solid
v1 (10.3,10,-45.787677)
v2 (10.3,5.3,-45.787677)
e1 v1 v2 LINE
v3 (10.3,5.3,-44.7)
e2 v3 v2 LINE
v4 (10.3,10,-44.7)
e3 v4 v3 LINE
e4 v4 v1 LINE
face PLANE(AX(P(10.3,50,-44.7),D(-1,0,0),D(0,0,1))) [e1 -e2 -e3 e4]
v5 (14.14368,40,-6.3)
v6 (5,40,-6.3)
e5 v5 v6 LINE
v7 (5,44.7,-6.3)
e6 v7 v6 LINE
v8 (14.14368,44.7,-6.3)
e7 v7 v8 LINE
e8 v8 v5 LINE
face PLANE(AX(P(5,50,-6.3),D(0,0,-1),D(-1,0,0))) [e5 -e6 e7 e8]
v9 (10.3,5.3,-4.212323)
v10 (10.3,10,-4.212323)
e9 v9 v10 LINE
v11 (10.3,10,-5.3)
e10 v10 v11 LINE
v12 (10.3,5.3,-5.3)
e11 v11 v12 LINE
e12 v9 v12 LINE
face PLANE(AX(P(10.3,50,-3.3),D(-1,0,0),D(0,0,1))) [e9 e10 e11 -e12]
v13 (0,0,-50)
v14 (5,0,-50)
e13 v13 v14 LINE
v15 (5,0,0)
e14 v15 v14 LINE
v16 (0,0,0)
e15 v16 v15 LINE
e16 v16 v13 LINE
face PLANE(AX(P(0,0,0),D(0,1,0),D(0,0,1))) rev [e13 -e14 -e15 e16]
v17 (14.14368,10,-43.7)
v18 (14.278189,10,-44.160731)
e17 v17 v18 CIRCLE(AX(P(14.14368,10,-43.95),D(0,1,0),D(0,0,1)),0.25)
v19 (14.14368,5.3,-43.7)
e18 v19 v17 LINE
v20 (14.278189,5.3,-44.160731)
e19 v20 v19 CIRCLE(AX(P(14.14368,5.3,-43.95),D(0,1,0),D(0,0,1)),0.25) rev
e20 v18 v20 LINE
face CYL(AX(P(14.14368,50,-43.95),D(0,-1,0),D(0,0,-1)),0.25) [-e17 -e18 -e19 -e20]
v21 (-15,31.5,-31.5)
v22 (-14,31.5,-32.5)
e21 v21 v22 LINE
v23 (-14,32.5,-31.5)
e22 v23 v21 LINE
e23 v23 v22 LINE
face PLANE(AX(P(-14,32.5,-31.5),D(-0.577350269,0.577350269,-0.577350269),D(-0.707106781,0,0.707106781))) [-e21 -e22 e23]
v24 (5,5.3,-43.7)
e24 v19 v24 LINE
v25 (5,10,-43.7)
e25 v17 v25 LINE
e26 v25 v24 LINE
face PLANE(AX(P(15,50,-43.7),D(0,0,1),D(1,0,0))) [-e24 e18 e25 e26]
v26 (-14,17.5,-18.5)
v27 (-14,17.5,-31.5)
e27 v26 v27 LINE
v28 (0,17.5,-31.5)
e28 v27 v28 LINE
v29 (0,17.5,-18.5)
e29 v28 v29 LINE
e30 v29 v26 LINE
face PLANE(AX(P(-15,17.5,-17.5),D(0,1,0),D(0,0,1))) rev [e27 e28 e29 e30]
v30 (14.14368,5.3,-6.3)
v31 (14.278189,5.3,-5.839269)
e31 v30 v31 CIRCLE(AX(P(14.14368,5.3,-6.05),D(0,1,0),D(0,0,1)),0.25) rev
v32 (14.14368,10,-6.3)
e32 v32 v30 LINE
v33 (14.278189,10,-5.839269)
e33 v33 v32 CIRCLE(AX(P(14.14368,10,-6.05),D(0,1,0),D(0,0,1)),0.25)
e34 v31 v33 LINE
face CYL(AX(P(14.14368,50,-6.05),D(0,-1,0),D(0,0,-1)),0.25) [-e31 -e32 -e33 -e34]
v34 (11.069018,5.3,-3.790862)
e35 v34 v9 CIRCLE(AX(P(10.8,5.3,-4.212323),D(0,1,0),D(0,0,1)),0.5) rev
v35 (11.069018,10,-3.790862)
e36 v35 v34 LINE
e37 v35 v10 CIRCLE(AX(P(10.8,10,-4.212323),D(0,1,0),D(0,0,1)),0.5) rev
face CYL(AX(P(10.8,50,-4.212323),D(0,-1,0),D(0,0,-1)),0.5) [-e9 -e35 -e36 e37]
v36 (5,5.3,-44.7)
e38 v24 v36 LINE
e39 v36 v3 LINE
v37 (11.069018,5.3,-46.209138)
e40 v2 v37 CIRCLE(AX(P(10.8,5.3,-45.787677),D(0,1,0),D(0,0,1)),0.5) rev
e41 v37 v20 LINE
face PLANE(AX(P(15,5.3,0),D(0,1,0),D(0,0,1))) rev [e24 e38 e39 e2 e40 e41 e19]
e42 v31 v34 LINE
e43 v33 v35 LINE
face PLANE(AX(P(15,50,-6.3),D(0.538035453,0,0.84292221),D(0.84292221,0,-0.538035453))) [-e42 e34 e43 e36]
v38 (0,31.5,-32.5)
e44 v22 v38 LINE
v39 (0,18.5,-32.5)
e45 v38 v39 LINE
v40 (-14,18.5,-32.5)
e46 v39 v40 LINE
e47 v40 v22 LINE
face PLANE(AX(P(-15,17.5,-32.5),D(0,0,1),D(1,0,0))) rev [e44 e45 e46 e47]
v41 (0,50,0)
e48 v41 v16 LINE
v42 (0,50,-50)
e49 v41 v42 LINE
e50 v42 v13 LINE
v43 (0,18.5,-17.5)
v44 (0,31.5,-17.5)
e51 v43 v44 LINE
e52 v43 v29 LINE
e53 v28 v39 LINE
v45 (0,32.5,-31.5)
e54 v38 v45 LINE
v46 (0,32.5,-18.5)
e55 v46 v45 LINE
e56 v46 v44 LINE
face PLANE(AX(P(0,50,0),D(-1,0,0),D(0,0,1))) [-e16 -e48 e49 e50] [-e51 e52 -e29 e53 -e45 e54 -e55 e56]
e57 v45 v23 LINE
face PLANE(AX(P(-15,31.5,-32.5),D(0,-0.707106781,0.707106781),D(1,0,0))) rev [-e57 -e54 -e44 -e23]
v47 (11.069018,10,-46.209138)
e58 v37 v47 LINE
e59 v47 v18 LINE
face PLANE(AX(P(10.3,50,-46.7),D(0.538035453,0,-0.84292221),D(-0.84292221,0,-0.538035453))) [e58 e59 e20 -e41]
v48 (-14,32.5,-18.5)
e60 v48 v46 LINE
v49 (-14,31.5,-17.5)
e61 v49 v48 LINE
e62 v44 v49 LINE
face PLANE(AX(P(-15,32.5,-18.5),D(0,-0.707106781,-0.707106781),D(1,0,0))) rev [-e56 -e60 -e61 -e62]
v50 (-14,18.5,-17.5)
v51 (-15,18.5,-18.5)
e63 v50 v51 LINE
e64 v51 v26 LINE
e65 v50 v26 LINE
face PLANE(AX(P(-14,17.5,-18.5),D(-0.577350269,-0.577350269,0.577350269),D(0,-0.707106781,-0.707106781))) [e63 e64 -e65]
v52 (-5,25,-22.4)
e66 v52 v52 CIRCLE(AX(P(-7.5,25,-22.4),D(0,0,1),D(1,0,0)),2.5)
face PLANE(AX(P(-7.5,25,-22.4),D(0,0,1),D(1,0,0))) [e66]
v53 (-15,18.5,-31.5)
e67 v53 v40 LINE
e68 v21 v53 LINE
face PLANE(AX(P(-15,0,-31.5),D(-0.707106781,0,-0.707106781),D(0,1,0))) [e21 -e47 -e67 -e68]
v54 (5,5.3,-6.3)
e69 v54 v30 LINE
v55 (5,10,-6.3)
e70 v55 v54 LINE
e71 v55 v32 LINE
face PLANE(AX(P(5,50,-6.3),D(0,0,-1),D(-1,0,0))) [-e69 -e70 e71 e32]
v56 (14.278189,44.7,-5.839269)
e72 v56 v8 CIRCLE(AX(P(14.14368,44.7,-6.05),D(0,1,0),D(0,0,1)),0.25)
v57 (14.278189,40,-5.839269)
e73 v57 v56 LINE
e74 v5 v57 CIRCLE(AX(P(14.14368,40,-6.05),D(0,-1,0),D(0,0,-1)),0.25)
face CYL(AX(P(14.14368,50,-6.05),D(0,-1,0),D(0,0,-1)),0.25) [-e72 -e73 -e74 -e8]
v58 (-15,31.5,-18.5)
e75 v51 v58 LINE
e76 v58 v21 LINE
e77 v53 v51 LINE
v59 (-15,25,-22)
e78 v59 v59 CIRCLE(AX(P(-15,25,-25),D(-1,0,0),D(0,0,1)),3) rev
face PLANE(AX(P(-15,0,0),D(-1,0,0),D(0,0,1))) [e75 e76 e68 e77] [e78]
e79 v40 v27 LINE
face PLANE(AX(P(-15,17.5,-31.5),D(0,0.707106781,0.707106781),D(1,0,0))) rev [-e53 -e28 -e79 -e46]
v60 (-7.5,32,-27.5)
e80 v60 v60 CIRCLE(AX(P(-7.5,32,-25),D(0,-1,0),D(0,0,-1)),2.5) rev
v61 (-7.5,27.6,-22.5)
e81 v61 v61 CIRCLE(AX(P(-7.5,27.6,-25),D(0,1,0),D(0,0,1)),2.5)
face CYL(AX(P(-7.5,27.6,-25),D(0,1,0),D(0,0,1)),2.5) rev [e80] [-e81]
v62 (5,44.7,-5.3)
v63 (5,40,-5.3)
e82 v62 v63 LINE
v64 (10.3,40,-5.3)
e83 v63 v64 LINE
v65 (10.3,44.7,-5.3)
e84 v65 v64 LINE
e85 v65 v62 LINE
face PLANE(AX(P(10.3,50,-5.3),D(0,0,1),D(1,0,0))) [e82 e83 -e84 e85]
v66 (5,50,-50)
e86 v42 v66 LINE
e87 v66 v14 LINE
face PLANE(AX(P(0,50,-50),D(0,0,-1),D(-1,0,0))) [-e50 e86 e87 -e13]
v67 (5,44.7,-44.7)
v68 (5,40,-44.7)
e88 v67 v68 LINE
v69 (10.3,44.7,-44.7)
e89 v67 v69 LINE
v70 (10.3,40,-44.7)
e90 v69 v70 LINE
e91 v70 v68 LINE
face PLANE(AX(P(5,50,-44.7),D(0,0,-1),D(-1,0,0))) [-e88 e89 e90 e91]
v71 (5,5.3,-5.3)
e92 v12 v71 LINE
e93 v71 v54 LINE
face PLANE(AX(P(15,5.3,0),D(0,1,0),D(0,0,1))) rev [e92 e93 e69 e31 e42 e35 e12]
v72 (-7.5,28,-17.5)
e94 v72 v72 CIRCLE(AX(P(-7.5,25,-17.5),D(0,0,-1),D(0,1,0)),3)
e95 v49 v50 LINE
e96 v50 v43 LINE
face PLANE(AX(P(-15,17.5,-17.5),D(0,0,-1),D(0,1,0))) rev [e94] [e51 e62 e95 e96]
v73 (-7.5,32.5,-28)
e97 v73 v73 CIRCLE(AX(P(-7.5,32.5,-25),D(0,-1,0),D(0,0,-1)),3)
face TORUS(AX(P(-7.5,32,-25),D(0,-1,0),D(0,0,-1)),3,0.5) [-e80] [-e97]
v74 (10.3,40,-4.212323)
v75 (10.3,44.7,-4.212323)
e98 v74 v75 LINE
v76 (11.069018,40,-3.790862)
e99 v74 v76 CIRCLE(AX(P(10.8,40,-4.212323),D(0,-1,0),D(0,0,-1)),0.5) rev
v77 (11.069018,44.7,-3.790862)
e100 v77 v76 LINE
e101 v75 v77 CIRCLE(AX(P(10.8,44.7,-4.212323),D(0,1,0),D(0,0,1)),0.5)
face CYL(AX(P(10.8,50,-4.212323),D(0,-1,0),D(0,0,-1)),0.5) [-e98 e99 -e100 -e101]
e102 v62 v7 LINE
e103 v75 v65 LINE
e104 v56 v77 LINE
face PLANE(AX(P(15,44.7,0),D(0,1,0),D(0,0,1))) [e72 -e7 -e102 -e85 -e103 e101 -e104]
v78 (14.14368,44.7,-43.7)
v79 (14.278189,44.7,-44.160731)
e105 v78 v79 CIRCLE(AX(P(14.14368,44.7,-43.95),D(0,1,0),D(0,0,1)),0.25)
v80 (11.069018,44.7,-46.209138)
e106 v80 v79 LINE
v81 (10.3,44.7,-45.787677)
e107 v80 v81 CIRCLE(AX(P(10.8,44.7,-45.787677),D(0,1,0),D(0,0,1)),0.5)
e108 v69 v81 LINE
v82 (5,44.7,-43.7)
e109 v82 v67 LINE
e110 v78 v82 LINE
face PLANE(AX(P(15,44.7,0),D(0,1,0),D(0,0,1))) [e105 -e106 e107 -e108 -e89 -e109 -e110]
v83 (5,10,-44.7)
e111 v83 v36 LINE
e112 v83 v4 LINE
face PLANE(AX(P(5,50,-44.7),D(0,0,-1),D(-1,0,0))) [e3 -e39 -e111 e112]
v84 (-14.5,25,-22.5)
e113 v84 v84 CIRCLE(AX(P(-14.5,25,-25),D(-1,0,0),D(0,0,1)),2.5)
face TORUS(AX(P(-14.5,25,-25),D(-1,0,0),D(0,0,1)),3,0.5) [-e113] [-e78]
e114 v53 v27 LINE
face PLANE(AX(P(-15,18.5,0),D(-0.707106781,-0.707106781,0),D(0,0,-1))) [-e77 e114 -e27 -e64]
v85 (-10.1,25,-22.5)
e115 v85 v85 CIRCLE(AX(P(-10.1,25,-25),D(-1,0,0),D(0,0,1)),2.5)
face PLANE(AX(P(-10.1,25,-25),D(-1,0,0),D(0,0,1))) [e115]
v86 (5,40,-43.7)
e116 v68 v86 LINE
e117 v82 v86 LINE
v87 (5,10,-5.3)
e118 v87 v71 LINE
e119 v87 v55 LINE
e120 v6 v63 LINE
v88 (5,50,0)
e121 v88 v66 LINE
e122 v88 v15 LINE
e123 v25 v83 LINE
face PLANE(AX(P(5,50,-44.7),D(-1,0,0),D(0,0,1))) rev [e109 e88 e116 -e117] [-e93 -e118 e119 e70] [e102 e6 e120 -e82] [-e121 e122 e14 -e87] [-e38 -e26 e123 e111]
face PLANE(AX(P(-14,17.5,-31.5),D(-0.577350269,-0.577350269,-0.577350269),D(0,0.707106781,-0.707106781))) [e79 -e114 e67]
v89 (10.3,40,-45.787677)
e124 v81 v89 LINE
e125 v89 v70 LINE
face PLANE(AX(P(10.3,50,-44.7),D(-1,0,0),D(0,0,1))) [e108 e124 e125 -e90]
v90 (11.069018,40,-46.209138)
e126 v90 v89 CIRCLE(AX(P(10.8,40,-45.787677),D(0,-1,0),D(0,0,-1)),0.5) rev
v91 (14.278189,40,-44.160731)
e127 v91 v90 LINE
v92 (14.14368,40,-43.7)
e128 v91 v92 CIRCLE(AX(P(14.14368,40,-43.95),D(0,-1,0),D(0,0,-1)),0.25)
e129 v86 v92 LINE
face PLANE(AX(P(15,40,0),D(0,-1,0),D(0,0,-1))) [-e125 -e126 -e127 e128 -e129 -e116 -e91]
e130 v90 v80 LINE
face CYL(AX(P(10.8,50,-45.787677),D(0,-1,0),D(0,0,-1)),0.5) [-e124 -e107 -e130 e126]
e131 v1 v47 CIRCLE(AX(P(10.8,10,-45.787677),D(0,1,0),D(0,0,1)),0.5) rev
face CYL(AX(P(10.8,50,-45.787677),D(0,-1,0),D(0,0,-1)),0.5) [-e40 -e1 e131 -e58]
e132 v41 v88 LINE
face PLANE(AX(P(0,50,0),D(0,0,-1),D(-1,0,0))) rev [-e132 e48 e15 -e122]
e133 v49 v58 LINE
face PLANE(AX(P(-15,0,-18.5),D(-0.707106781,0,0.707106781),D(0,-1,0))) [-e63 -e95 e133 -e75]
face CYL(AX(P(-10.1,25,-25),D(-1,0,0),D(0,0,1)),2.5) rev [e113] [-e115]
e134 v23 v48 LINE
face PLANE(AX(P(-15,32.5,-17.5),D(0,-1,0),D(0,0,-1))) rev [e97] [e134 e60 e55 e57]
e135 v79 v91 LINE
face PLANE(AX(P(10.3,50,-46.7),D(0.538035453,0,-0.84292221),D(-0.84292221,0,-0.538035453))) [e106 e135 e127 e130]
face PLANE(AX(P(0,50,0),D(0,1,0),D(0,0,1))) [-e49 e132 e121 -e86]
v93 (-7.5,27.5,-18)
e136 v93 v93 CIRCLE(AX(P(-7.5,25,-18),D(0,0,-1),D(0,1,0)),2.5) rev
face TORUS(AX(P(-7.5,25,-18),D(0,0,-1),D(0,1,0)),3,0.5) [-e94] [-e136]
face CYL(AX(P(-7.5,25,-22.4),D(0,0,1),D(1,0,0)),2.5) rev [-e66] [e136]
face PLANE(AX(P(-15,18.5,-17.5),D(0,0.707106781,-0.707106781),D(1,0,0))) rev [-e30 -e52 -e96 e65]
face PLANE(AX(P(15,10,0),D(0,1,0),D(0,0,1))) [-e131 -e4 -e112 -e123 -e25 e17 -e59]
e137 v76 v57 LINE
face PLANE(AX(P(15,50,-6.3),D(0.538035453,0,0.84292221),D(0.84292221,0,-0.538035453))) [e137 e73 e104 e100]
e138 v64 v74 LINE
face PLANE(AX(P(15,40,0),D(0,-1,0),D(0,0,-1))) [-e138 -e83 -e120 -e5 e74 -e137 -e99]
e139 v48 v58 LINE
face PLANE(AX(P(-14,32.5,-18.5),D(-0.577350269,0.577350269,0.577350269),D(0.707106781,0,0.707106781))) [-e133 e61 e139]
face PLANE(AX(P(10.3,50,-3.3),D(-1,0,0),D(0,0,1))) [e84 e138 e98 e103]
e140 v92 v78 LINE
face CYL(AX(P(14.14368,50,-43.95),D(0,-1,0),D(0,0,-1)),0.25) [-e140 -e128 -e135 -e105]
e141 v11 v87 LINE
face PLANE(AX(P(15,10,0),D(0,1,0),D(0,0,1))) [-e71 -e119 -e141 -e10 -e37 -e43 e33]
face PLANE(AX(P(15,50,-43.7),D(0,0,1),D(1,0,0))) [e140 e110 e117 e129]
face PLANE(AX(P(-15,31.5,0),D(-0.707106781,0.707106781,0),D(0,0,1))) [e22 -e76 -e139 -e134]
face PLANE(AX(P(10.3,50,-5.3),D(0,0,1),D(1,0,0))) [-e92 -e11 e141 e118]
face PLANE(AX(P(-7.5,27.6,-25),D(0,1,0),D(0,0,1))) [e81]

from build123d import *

# Parameters (mm, degrees)
BOSS_EXTRUDE2_DEPTH = 50
SKETCH17_W          = 50
SKETCH17_H          = 5.3
CUT_EXTRUDE5_DEPTH  = 72.414284285
FILLET2_R           = 0.5
SKETCH18_W          = 15
SKETCH18_H          = 15
BOSS_EXTRUDE3_DEPTH = 15
SKETCH20_R          = 2.5
CUT_EXTRUDE6_DEPTH  = 4.9
SKETCH27_R          = 2.5
CUT_EXTRUDE11_DEPTH = 4.9
SKETCH30_R          = 2.5
CUT_EXTRUDE12_DEPTH = 4.9
CHAMFER1_SIZE       = 1
FILLET3_R           = 0.5
SKETCH31_W          = 50
SKETCH31_H          = 30
CUT_EXTRUDE13_DEPTH = 74.484692283
FILLET4_R           = 0.25


with BuildPart() as part:
    # Sketch3 → Boss-Extrude2 (new body)
    with BuildSketch(Plane(origin=(0, 0, 0), x_dir=(1, 0, 0), z_dir=(0, 1, 0))):
        Polygon((5, 44.7), (10.3, 44.7), (10.3, 46.7), (15, 43.7), (5, 43.7), (5, 6.3), (15, 6.3), (10.3, 3.3), (10.3, 5.3), (5, 5.3), (5, 0), (0, 0), (0, 50), (5, 50), align=None)
    extrude(amount=BOSS_EXTRUDE2_DEPTH)

    # Sketch17 → Cut-Extrude5 (cut, through all)
    with BuildSketch(Plane(origin=(5, 0, 0), x_dir=(0, 0, -1), z_dir=(1, 0, 0))):
        with Locations((25, 2.65)):
            Rectangle(SKETCH17_W, SKETCH17_H)
        with Locations((25, 47.35)):
            Rectangle(SKETCH17_W, SKETCH17_H)
    extrude(amount=CUT_EXTRUDE5_DEPTH, mode=Mode.SUBTRACT)

    # Fillet2
    fillet2_edges = [part.edges().sort_by_distance(p)[0] for p in [
        (10.3, 25, -46.7),
        (10.3, 25, -3.3),
    ]]
    fillet(fillet2_edges, radius=FILLET2_R)

    # Sketch18 → Boss-Extrude3 (add)
    with BuildSketch(Plane.ZY):
        with Locations((-25, 25)):
            Rectangle(SKETCH18_W, SKETCH18_H)
    extrude(amount=BOSS_EXTRUDE3_DEPTH)

    # Sketch20 → Cut-Extrude6 (cut)
    with BuildSketch(Plane(origin=(0, 32.5, 0), x_dir=(1, 0, 0), z_dir=(0, 1, 0))):
        with Locations((-7.5, 25)):
            Circle(SKETCH20_R)
    extrude(amount=-CUT_EXTRUDE6_DEPTH, mode=Mode.SUBTRACT)

    # Sketch27 → Cut-Extrude11 (cut)
    with BuildSketch(Plane.XY.offset(-17.5)):
        with Locations((-7.5, 25)):
            Circle(SKETCH27_R)
    extrude(amount=-CUT_EXTRUDE11_DEPTH, mode=Mode.SUBTRACT)

    # Sketch30 → Cut-Extrude12 (cut)
    with BuildSketch(Plane.ZY.offset(15)):
        with Locations((-25, 25)):
            Circle(SKETCH30_R)
    extrude(amount=-CUT_EXTRUDE12_DEPTH, mode=Mode.SUBTRACT)

    # Chamfer1
    chamfer1_edges = [part.edges().sort_by_distance(p)[0] for p in [
        (-7.5, 17.5, -17.5),
        (-15, 17.5, -25),
        (-7.5, 17.5, -32.5),
        (-7.5, 32.5, -32.5),
        (-15, 25, -32.5),
        (-15, 32.5, -25),
        (-15, 25, -17.5),
        (-7.5, 32.5, -17.5),
    ]]
    chamfer(chamfer1_edges, length=CHAMFER1_SIZE)

    # Fillet3
    fillet3_edges = [part.edges().sort_by_distance(p)[0] for p in [
        (-10, 32.5, -25),
        (-15, 25, -27.5),
        (-10, 25, -17.5),
    ]]
    fillet(fillet3_edges, radius=FILLET3_R)

    # Sketch31 → Cut-Extrude13 (cut, through all)
    with BuildSketch(Plane(origin=(5, 0, 0), x_dir=(0, 0, -1), z_dir=(1, 0, 0))):
        with Locations((25, 25)):
            Rectangle(SKETCH31_W, SKETCH31_H)
    extrude(amount=CUT_EXTRUDE13_DEPTH, mode=Mode.SUBTRACT)

    # Fillet4
    fillet4_edges = [part.edges().sort_by_distance(p)[0] for p in [
        (15, 42.35, -43.7),
        (15, 7.65, -43.7),
        (15, 7.65, -6.3),
        (15, 42.35, -6.3),
    ]]
    fillet(fillet4_edges, radius=FILLET4_R)


solid = part.part
